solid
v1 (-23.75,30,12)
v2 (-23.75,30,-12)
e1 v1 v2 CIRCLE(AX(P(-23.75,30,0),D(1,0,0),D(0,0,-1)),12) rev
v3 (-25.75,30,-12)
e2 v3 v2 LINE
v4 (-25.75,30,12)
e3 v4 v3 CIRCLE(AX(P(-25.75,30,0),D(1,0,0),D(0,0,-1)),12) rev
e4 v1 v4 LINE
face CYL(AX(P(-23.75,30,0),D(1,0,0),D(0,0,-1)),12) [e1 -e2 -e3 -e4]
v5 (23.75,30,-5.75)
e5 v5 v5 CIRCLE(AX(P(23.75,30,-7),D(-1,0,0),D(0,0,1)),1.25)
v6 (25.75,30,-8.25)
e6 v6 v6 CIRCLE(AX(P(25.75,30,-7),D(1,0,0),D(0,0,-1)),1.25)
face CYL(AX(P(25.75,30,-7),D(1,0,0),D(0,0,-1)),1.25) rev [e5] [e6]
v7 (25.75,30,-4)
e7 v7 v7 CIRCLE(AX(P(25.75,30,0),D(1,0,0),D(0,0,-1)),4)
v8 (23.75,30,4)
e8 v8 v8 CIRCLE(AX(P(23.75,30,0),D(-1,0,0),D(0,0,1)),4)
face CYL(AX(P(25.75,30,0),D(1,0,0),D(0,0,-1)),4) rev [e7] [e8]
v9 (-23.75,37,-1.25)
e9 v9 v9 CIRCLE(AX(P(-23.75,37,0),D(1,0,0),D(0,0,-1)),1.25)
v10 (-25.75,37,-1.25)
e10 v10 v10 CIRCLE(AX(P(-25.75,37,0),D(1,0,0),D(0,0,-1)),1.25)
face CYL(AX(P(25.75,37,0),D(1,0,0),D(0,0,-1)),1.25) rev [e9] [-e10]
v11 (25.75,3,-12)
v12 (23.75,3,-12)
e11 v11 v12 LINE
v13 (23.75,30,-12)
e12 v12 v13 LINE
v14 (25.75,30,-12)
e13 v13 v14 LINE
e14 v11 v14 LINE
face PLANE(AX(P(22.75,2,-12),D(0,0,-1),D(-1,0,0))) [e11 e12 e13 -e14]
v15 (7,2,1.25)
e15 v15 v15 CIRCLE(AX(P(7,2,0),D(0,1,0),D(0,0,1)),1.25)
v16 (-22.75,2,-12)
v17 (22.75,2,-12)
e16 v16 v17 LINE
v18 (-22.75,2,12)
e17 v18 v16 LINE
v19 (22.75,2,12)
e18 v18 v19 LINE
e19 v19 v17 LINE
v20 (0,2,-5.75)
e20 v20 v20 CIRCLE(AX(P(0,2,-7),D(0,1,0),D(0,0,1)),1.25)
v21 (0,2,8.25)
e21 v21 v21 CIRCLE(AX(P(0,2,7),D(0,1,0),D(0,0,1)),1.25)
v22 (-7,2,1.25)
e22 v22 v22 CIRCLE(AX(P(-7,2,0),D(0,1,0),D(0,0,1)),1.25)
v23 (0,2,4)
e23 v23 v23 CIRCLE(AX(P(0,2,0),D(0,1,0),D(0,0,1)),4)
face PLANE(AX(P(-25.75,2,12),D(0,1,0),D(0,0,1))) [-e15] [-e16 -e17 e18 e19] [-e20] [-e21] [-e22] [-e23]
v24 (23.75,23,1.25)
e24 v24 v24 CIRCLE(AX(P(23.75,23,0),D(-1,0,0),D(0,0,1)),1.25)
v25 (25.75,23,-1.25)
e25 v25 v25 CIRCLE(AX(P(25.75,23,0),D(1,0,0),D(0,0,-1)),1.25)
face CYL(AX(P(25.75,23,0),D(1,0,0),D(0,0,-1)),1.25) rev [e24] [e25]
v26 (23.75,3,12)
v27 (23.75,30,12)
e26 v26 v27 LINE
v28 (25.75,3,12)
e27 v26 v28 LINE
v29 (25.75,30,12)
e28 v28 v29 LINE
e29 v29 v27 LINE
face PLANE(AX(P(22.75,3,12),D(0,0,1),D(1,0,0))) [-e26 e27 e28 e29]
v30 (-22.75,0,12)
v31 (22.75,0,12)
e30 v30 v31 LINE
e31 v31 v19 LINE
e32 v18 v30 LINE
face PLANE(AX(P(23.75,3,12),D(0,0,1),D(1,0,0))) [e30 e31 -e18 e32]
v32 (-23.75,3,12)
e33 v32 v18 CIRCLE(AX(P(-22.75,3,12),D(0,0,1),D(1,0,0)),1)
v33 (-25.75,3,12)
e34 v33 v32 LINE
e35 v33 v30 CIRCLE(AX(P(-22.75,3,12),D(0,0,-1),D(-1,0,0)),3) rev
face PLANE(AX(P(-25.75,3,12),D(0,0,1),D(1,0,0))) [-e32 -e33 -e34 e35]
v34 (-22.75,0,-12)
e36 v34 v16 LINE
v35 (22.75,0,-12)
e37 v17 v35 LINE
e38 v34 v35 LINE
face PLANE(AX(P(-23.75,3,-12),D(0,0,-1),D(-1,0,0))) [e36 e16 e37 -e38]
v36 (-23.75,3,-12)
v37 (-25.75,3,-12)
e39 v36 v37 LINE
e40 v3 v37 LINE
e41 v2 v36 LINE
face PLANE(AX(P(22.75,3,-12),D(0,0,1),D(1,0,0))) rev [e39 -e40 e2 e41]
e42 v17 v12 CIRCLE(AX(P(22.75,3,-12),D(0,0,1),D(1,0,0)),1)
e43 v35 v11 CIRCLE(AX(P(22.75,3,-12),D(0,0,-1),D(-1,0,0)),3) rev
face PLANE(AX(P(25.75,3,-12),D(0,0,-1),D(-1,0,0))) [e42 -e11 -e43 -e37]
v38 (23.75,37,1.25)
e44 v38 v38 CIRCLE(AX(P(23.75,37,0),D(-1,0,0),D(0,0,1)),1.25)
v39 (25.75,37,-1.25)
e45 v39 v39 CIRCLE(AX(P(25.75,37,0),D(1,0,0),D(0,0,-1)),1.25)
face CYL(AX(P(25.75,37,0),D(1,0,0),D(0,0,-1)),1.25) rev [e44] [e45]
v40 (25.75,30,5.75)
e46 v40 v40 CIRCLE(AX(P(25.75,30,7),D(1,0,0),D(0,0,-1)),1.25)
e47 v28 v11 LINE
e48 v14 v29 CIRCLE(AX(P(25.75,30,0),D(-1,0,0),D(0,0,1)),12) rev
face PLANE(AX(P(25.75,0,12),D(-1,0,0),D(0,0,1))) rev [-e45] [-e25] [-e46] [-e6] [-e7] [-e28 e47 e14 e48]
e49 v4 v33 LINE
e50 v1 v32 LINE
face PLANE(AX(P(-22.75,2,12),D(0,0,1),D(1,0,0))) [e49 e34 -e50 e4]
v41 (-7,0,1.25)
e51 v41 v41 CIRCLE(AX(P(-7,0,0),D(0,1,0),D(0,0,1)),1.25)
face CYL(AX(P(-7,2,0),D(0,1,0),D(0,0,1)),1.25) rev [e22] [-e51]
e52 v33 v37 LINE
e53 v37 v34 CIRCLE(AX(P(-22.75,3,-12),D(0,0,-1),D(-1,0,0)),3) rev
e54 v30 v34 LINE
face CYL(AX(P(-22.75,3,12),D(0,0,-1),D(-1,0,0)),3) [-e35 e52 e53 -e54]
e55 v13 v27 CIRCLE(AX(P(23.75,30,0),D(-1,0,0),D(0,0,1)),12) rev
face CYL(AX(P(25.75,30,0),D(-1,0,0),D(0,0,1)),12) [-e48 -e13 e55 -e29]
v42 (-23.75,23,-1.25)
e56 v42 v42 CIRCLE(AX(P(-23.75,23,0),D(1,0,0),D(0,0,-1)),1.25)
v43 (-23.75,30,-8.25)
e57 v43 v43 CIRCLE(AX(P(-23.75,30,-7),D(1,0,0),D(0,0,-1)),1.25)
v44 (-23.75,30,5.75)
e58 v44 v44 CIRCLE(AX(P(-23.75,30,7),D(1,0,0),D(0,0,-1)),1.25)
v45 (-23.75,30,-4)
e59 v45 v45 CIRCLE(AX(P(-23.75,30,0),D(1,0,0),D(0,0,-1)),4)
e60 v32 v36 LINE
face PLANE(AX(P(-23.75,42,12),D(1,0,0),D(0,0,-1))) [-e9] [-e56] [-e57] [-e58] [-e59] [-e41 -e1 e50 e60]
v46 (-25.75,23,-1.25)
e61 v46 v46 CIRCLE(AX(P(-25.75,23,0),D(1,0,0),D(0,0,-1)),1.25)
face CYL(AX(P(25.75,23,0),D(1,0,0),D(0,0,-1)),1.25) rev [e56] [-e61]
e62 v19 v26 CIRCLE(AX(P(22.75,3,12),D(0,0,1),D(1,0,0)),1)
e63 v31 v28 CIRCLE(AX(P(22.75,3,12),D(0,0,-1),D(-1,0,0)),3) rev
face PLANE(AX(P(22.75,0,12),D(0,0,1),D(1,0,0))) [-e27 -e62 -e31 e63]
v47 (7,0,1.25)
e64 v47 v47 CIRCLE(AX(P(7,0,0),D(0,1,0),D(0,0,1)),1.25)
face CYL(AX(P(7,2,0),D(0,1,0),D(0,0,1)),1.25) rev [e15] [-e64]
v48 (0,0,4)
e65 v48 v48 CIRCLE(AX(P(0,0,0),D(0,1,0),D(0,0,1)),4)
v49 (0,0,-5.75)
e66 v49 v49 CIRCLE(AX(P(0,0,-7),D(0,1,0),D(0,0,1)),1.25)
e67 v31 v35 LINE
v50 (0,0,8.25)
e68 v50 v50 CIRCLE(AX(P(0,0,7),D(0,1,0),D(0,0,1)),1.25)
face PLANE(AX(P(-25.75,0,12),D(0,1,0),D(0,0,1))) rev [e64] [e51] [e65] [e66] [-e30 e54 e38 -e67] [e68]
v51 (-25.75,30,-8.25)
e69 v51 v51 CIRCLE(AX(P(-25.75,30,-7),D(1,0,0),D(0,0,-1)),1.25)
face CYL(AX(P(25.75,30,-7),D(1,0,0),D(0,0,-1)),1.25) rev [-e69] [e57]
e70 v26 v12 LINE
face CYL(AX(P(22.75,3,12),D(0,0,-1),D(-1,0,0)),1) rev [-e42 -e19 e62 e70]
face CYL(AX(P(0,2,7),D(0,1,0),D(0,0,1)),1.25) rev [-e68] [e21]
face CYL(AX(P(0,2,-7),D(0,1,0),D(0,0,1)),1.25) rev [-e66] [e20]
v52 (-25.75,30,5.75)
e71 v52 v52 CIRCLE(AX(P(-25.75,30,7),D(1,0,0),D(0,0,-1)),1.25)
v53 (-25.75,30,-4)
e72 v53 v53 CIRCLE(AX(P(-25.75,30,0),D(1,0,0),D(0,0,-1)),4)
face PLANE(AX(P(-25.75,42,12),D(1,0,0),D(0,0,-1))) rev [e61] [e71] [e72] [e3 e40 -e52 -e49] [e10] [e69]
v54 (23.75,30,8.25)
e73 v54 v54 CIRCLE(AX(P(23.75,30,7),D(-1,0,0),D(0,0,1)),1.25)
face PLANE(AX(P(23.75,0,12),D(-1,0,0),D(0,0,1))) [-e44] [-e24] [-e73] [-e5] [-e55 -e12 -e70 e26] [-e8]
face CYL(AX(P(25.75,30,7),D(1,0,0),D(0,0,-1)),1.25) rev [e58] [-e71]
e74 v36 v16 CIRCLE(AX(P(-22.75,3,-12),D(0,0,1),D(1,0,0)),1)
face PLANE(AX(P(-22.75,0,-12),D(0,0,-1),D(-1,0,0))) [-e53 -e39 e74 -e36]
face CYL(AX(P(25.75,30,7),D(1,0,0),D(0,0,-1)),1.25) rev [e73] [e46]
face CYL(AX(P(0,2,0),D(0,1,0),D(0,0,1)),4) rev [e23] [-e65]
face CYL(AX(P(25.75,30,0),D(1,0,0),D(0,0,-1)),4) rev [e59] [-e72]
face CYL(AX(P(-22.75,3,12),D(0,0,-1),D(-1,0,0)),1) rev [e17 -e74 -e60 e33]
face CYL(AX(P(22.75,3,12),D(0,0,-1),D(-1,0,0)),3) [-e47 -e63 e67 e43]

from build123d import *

# Parameters (mm, degrees)
T_LE_DE_BASE_PLI_E1_DEPTH       = 12
ENL_V_START                     = -51.5
ENL_V_MAT_EXTRU_1_DEPTH         = 51.5
DIAM_TRE_DU_PER_AGE_8_0_8_1_D   = 8
DIAM_TRE_DU_PER_AGE_2_5_2_5_1_D = 2.5
DIAM_TRE_DU_PER_AGE_8_0_8_2_D   = 8
DIAM_TRE_DU_PER_AGE_2_5_2_5_2_D = 2.5


# Read off the part's stored shape, not the designer's step: Enlèv. mat.-Extru.1
# Sheet-metal steps are written as plain solids
with BuildPart() as part:
    # Esquisse1 → Tôle de base pliée1 (new, symmetric)
    with BuildSketch(Plane.XY):
        with BuildLine():
            Line((-25.75, 42), (-25.75, 3))
            ThreePointArc((-25.75, 3), (-24.871320344, 0.878679656), (-22.75, 0))
            Line((-22.75, 0), (22.75, 0))
            ThreePointArc((22.75, 0), (24.871320344, 0.878679656), (25.75, 3))
            Line((25.75, 3), (25.75, 42))
            Line((25.75, 42), (23.75, 42))
            Line((23.75, 42), (23.75, 3))
            ThreePointArc((23.75, 3), (23.457106781, 2.292893219), (22.75, 2))
            Line((22.75, 2), (-22.75, 2))
            ThreePointArc((-22.75, 2), (-23.457106781, 2.292893219), (-23.75, 3))
            Line((-23.75, 3), (-23.75, 42))
            Line((-23.75, 42), (-25.75, 42))
        make_face()
    extrude(amount=T_LE_DE_BASE_PLI_E1_DEPTH, both=True)

    # Enlèv. mat.-Extru.1 outline → Enlèv. mat.-Extru.1 (cut)
    with BuildSketch(Plane(origin=(25.75, 0, 0), x_dir=(0, 0, -1), z_dir=(1, 0, 0)).offset(ENL_V_START)):
        with BuildLine():
            ThreePointArc((-12, 30), (-8.485281374, 38.485281374), (0, 42))
            Line((0, 42), (-12, 42))
            Line((-12, 42), (-12, 30))
        make_face()
        with BuildLine():
            ThreePointArc((0, 42), (8.485281374, 38.485281374), (12, 30))
            Line((12, 30), (12, 42))
            Line((12, 42), (0, 42))
        make_face()
    extrude(amount=ENL_V_MAT_EXTRU_1_DEPTH, mode=Mode.SUBTRACT)

    # Diamètre du perçage Ø8.0 (8)1 (through all)
    with Locations(Plane(origin=(25.75, 0, 0), x_dir=(0, 0, -1), z_dir=(1, 0, 0))):
        with Locations((0, 30)):
            Hole(DIAM_TRE_DU_PER_AGE_8_0_8_1_D / 2)

    # Diamètre du perçage Ø2.5 (2.5)1 (through all)
    with Locations(Plane(origin=(25.75, 0, 0), x_dir=(0, 0, -1), z_dir=(1, 0, 0))):
        with Locations((-7, 30), (0, 37), (7, 30), (0, 23)):
            Hole(DIAM_TRE_DU_PER_AGE_2_5_2_5_1_D / 2)

    # Diamètre du perçage Ø8.0 (8)2 (through all)
    with Locations(Plane(origin=(0, 2, 0), x_dir=(1, 0, 0), z_dir=(0, 1, 0))):
        with Locations((0, 0)):
            Hole(DIAM_TRE_DU_PER_AGE_8_0_8_2_D / 2)

    # Diamètre du perçage Ø2.5 (2.5)2 (through all)
    with Locations(Plane(origin=(0, 2, 0), x_dir=(1, 0, 0), z_dir=(0, 1, 0))):
        with Locations((-7, 0), (0, 7), (7, 0), (0, -7)):
            Hole(DIAM_TRE_DU_PER_AGE_2_5_2_5_2_D / 2)


solid = part.part
